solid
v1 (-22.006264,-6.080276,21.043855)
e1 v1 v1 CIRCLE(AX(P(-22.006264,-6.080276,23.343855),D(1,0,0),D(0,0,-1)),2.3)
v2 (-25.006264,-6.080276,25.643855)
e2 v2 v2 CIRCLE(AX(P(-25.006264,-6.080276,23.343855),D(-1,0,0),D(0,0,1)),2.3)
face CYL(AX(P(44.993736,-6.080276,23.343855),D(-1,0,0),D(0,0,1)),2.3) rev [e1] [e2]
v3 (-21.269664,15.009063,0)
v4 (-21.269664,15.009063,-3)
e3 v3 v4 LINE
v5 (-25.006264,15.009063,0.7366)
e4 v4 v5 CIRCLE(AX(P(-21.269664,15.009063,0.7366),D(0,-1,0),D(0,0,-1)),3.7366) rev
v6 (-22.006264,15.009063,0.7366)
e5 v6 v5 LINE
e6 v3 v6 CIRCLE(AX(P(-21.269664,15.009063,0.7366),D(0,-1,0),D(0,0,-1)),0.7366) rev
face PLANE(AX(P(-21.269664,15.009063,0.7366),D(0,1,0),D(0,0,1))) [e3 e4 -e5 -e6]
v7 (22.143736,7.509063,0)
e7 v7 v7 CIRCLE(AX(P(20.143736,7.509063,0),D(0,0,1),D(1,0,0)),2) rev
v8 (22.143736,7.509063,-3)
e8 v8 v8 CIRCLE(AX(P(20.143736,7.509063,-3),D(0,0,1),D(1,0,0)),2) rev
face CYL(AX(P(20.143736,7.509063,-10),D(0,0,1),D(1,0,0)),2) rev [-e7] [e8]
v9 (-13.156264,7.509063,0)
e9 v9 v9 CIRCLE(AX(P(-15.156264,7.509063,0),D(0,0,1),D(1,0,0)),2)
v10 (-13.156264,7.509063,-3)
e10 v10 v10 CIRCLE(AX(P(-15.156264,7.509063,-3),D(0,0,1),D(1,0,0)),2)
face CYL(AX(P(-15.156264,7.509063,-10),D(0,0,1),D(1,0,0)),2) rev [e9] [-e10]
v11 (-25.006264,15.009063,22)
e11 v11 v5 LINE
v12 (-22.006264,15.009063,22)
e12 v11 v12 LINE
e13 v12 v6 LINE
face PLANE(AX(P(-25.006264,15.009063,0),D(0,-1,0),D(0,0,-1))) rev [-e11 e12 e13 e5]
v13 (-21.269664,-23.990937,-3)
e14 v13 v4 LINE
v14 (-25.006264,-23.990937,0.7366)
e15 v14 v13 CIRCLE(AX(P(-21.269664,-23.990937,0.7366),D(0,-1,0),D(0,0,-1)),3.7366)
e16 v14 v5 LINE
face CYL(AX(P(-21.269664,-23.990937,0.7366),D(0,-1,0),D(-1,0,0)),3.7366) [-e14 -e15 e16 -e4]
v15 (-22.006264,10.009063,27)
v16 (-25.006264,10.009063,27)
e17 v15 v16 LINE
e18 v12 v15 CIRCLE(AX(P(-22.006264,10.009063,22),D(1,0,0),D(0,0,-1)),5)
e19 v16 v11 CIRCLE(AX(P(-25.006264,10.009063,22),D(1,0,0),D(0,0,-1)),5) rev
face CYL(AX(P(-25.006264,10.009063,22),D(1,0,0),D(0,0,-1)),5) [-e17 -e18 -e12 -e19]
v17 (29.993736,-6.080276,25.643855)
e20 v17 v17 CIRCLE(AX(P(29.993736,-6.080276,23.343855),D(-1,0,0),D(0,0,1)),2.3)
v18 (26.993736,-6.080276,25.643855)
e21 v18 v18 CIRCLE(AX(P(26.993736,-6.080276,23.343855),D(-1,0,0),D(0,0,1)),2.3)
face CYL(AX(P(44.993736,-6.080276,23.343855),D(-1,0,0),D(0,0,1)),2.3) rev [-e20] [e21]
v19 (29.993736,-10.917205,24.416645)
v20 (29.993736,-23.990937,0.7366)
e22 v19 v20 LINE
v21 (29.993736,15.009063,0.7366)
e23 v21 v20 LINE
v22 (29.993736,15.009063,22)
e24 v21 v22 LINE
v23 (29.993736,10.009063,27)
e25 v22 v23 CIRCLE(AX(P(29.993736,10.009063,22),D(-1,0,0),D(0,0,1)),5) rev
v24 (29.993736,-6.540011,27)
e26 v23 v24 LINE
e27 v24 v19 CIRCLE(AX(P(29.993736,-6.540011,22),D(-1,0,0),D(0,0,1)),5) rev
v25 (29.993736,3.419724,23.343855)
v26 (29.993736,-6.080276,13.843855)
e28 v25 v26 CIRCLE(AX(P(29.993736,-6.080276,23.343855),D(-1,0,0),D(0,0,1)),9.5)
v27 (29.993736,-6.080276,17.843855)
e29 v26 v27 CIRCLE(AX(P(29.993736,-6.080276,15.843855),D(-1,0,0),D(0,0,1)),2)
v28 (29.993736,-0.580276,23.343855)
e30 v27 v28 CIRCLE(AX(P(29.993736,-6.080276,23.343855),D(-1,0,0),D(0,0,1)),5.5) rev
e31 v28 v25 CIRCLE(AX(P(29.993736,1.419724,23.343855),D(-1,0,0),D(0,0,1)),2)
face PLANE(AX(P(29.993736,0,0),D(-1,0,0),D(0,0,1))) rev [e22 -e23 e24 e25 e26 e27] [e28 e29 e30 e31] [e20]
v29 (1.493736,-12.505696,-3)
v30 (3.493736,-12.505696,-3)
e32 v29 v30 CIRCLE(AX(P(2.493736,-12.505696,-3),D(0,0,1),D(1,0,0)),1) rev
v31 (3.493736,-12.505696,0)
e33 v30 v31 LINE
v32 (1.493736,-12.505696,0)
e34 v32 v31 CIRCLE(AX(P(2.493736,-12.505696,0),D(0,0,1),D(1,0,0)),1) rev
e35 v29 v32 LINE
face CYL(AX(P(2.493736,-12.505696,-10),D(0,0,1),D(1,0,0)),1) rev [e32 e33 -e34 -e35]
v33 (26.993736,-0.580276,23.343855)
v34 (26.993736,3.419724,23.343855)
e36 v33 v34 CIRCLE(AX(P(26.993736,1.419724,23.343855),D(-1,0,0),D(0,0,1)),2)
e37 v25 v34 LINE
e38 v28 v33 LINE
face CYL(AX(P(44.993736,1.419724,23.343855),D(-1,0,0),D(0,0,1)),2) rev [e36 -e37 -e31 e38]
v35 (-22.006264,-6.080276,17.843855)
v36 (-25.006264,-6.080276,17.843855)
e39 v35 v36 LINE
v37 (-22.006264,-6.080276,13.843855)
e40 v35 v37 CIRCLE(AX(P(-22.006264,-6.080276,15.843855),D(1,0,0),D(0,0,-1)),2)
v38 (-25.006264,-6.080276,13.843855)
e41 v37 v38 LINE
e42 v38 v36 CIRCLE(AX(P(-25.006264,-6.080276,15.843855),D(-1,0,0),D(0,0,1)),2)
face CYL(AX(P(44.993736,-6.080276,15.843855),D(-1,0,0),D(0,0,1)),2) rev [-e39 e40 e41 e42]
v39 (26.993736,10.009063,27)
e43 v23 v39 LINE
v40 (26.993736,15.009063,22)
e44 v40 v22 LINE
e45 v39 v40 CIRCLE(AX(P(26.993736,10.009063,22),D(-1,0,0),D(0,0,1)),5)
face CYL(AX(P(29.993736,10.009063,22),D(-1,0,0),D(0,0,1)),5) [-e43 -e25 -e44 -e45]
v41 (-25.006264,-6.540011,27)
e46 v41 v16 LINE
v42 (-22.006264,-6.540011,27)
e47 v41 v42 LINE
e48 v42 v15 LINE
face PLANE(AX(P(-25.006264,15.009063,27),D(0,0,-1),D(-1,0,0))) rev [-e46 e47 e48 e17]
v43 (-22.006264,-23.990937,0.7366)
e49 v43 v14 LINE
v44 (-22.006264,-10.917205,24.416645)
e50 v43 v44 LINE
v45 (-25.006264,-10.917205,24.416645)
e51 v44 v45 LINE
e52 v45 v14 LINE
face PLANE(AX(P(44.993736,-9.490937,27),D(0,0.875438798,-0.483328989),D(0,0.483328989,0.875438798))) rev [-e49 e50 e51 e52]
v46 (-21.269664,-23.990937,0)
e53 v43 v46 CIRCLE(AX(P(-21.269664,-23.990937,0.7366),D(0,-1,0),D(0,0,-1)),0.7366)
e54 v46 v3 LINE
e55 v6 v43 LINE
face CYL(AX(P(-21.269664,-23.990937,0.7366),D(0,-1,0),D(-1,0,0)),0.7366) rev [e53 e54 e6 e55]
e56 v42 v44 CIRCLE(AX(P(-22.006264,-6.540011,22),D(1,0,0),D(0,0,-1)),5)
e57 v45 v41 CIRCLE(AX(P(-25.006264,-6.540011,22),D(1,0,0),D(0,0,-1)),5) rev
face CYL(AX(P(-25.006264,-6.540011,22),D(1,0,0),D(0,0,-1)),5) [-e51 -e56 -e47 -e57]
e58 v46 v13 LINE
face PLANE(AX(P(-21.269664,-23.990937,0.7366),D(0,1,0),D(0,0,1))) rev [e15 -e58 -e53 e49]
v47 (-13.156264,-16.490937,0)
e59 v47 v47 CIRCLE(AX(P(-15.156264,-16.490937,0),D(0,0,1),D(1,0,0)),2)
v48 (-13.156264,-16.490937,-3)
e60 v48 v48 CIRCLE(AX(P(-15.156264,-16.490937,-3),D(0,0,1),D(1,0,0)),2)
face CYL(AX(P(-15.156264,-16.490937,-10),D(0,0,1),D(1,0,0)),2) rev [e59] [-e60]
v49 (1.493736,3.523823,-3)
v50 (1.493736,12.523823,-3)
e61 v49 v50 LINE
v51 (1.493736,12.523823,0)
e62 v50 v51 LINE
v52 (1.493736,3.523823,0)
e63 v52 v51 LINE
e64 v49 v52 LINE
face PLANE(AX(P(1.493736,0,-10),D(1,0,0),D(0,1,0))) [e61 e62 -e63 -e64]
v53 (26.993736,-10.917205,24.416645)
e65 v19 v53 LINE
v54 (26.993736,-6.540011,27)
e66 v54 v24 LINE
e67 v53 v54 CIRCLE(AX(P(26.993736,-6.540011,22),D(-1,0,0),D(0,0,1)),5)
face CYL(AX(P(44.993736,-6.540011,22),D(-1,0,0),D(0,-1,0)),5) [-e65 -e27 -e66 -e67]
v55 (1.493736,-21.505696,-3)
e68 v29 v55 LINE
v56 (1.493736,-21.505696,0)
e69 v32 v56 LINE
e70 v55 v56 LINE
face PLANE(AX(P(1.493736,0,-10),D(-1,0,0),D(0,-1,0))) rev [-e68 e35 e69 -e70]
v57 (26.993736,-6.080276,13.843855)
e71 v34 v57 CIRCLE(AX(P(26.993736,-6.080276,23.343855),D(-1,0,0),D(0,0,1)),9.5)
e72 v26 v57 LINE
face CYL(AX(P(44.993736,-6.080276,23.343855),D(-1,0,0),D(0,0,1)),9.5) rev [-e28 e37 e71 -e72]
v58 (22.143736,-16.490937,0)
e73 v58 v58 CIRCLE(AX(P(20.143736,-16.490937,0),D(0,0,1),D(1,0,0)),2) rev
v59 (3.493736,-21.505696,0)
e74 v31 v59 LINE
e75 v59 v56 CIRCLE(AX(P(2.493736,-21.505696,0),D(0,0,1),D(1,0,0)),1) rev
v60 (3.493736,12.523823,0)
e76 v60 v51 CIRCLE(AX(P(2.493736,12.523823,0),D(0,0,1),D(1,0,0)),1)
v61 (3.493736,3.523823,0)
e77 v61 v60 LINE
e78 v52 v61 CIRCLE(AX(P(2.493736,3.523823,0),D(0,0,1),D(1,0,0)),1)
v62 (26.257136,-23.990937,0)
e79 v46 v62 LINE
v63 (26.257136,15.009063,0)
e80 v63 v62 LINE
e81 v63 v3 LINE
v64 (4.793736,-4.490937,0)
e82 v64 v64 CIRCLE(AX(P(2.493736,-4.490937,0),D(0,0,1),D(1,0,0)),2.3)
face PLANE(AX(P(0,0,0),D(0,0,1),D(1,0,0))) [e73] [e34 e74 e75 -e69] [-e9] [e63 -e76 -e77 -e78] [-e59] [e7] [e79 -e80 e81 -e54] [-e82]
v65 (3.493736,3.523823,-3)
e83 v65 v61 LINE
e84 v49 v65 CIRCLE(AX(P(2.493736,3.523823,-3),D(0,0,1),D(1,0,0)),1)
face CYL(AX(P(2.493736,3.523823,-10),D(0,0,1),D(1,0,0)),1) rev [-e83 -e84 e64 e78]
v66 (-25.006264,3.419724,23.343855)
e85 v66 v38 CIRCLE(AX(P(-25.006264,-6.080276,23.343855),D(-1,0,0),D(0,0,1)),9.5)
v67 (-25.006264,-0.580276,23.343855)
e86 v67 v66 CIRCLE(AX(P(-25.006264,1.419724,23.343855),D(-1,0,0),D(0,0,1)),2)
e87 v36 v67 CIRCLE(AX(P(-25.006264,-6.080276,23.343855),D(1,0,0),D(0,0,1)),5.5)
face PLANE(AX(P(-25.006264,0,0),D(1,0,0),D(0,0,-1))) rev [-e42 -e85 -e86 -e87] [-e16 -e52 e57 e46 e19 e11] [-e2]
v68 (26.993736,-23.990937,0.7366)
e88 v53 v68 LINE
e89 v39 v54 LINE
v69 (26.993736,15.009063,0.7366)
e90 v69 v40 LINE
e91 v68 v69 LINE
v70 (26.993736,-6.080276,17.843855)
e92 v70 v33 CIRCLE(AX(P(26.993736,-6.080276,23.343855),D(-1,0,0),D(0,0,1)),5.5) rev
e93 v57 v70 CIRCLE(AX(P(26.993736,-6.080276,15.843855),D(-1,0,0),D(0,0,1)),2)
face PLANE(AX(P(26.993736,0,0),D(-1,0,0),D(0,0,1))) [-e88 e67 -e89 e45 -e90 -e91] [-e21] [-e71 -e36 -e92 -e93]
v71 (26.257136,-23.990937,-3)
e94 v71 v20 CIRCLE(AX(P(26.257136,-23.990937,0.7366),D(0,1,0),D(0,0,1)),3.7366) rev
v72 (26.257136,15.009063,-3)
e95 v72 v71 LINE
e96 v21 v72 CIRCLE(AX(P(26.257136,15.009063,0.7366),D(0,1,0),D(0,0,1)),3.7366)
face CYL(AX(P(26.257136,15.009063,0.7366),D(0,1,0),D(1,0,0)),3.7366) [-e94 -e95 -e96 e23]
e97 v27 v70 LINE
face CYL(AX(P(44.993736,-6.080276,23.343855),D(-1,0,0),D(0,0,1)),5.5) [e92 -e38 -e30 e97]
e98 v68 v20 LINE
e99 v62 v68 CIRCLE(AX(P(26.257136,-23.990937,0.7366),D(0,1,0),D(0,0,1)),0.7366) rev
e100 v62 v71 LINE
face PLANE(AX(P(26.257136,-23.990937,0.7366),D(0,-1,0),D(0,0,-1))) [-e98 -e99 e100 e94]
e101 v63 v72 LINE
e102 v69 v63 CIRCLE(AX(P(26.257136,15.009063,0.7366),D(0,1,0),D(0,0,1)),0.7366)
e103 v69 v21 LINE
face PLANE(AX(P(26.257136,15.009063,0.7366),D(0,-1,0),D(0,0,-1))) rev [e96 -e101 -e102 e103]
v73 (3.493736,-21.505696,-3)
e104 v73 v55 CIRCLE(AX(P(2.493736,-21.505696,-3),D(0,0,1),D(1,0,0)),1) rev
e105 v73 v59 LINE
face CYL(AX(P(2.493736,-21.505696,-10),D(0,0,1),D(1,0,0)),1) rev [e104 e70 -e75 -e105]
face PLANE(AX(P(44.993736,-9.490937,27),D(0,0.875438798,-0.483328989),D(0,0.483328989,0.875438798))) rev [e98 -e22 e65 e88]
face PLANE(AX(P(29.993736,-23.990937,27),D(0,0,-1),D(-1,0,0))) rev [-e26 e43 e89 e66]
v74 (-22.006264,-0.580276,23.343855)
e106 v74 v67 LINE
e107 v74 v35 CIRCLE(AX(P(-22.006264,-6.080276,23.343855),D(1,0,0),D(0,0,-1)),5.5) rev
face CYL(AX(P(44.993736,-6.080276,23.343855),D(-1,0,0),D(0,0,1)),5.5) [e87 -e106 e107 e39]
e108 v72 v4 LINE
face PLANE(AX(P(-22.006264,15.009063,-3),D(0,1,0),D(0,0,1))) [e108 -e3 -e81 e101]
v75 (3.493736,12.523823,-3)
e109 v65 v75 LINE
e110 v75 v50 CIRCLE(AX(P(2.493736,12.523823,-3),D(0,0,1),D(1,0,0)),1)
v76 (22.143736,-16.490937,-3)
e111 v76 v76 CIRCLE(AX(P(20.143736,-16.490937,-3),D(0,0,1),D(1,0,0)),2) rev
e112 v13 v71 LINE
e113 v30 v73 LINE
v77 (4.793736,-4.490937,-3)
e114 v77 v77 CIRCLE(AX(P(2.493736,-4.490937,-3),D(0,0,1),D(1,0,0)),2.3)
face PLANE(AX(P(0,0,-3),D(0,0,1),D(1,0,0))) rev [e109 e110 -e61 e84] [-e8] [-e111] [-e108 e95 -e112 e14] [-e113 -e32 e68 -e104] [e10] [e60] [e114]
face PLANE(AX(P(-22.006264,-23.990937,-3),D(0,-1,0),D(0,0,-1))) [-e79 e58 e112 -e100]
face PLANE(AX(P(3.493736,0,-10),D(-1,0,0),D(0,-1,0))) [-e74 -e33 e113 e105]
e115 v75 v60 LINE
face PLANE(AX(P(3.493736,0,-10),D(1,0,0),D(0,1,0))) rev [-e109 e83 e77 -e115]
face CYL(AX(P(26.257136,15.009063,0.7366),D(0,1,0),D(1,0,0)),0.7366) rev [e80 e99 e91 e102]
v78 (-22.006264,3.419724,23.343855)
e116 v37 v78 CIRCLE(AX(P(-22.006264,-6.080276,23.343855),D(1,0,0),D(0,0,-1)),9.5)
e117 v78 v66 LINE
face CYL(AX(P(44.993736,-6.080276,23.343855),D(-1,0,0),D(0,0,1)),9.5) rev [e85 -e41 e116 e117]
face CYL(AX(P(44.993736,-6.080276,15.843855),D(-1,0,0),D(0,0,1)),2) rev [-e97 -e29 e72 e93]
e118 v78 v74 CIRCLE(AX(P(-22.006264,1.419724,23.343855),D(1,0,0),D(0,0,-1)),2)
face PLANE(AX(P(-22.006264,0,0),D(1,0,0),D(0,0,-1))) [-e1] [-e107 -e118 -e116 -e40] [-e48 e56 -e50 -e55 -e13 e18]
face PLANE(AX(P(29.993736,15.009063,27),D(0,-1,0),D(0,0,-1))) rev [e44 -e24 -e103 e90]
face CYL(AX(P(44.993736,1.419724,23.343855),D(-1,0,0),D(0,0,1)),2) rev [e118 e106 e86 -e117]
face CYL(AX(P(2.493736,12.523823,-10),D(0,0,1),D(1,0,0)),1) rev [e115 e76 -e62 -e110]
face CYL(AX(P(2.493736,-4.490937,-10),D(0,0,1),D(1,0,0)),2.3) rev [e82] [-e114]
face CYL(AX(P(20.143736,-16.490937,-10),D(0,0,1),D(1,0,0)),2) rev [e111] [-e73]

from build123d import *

# Parameters (mm, degrees)
ESBO_O1_W                        = 49
ESBO_O1_H                        = 39
FLANGE_BASE1_DEPTH               = 3
ESBO_O6_R                        = 2.3
CORTE_EXTRUS_O1_DEPTH            = 10
ARESTA_FLANGE1_STRIP_W           = 13.4732
ARESTA_FLANGE1_STRIP_H           = 3
ARESTA_FLANGE1_STRIP_CUT_DEPTH   = 39
ARESTA_FLANGE1_STRIP_2_W         = 13.4732
ARESTA_FLANGE1_STRIP_2_H         = 3
ARESTA_FLANGE1_STRIP_CUT_2_DEPTH = 39
ARESTA_FLANGE1_DEPTH             = 39
ARESTA_FLANGE1_BEND_DEPTH        = 39
ESBO_O13_R                       = 2.3
CORTE_EXTRUS_O2_DEPTH            = 70
FILETE1_R                        = 5


# Sheet-metal steps are written as plain solids
with BuildPart() as part:
    # Esboço1 → Flange-base1 (new body)
    with BuildSketch(Plane.XY):
        with Locations((2.493735783, -4.490936556)):
            Rectangle(ESBO_O1_W, ESBO_O1_H)
    extrude(amount=-FLANGE_BASE1_DEPTH)

    # Esboço6 → Corte-extrusão1 (cut)
    with BuildSketch(Plane.XY):
        with BuildLine():
            Line((-15.156264217, 5.509063444), (-15.156264217, 7.509063444))
            Line((-15.156264217, 7.509063444), (-13.156264217, 7.509063444))
            ThreePointArc((-13.156264217, 7.509063444), (-16.570477779, 8.923277006), (-15.156264217, 5.509063444))
        make_face()
        with BuildLine():
            Line((-13.156264217, 7.509063444), (-15.156264217, 7.509063444))
            Line((-15.156264217, 7.509063444), (-15.156264217, 5.509063444))
            ThreePointArc((-15.156264217, 5.509063444), (-13.742050654, 6.094849882), (-13.156264217, 7.509063444))
        make_face()
        with BuildLine():
            ThreePointArc((-13.156264217, -16.490936556), (-13.742050654, -15.076722994), (-15.156264217, -14.490936556))
            Line((-15.156264217, -14.490936556), (-15.156264217, -16.490936556))
            Line((-15.156264217, -16.490936556), (-13.156264217, -16.490936556))
        make_face()
        with BuildLine():
            Line((-15.156264217, -16.490936556), (-15.156264217, -14.490936556))
            ThreePointArc((-15.156264217, -14.490936556), (-16.570477779, -17.905150118), (-13.156264217, -16.490936556))
            Line((-13.156264217, -16.490936556), (-15.156264217, -16.490936556))
        make_face()
        with Locations((2.493735783, -4.490936556)):
            Circle(ESBO_O6_R)
        with BuildLine():
            Line((3.493735783, 7.509063444), (1.493735783, 7.509063444))
            Line((1.493735783, 7.509063444), (1.493735783, 3.523823043))
            ThreePointArc((1.493735783, 3.523823043), (2.493735783, 2.523823043), (3.493735783, 3.523823043))
            Line((3.493735783, 3.523823043), (3.493735783, 7.509063444))
        make_face()
        with BuildLine():
            Line((1.493735783, 12.523823043), (1.493735783, 7.509063444))
            Line((1.493735783, 7.509063444), (3.493735783, 7.509063444))
            Line((3.493735783, 7.509063444), (3.493735783, 12.523823043))
            ThreePointArc((3.493735783, 12.523823043), (2.493735783, 13.523823043), (1.493735783, 12.523823043))
        make_face()
        with BuildLine():
            Line((1.493735783, -12.505696155), (1.493735783, -16.490936556))
            Line((1.493735783, -16.490936556), (3.493735783, -16.490936556))
            Line((3.493735783, -16.490936556), (3.493735783, -12.505696155))
            ThreePointArc((3.493735783, -12.505696155), (2.493735783, -11.505696155), (1.493735783, -12.505696155))
        make_face()
        with BuildLine():
            Line((3.493735783, -16.490936556), (1.493735783, -16.490936556))
            Line((1.493735783, -16.490936556), (1.493735783, -21.505696155))
            ThreePointArc((1.493735783, -21.505696155), (2.493735783, -22.505696155), (3.493735783, -21.505696155))
            Line((3.493735783, -21.505696155), (3.493735783, -16.490936556))
        make_face()
        with BuildLine():
            ThreePointArc((22.143735783, -16.490936556), (21.557949346, -15.076722994), (20.143735783, -14.490936556))
            Line((20.143735783, -14.490936556), (20.143735783, -16.490936556))
            Line((20.143735783, -16.490936556), (18.143735783, -16.490936556))
            ThreePointArc((18.143735783, -16.490936556), (20.143735783, -18.490936556), (22.143735783, -16.490936556))
        make_face()
        with BuildLine():
            Line((20.143735783, -16.490936556), (20.143735783, -14.490936556))
            ThreePointArc((20.143735783, -14.490936556), (18.729522221, -15.076722994), (18.143735783, -16.490936556))
            Line((18.143735783, -16.490936556), (20.143735783, -16.490936556))
        make_face()
        with BuildLine():
            ThreePointArc((22.143735783, 7.509063444), (20.143735783, 9.509063444), (18.143735783, 7.509063444))
            Line((18.143735783, 7.509063444), (20.143735783, 7.509063444))
            Line((20.143735783, 7.509063444), (20.143735783, 5.509063444))
            ThreePointArc((20.143735783, 5.509063444), (21.557949346, 6.094849882), (22.143735783, 7.509063444))
        make_face()
        with BuildLine():
            Line((20.143735783, 7.509063444), (18.143735783, 7.509063444))
            ThreePointArc((18.143735783, 7.509063444), (18.729522221, 6.094849882), (20.143735783, 5.509063444))
            Line((20.143735783, 5.509063444), (20.143735783, 7.509063444))
        make_face()
    extrude(amount=-CORTE_EXTRUS_O1_DEPTH, mode=Mode.SUBTRACT)

    # Aresta-Flange1 strip (across the edge) → Aresta-Flange1 strip cut (cut)
    with BuildSketch(Plane(origin=(26.993735783, -23.990936556, 0), x_dir=(-1, 0, 0), z_dir=(0, 1, 0))):
        with Locations((-6, -1.5)):
            Rectangle(ARESTA_FLANGE1_STRIP_W, ARESTA_FLANGE1_STRIP_H)
    extrude(amount=ARESTA_FLANGE1_STRIP_CUT_DEPTH, mode=Mode.SUBTRACT)

    # Aresta-Flange1 strip 2 (across the edge) → Aresta-Flange1 strip cut 2 (cut)
    with BuildSketch(Plane(origin=(-22.006264217, 15.009063444, 0), x_dir=(1, 0, 0), z_dir=(0, -1, 0))):
        with Locations((-6, -1.5)):
            Rectangle(ARESTA_FLANGE1_STRIP_2_W, ARESTA_FLANGE1_STRIP_2_H)
    extrude(amount=ARESTA_FLANGE1_STRIP_CUT_2_DEPTH, mode=Mode.SUBTRACT)

    # Aresta-Flange1 section (across the edge) → Aresta-Flange1 (add)
    with BuildSketch(Plane(origin=(26.993735783, -23.990936556, 0), x_dir=(-1, 0, 0), z_dir=(0, 1, 0))):
        with BuildLine():
            Line((-3, 0.7366), (-3, 27))
            Line((-3, 27), (0, 27))
            Line((0, 27), (0, 0.7366))
            ThreePointArc((0, 0.7366), (0.215745145, 0.215745145), (0.7366, 0))
            Line((0.7366, 0), (0.7366, -3))
            ThreePointArc((0.7366, -3), (-1.905575199, -1.905575199), (-3, 0.7366))
        make_face()
    extrude(amount=ARESTA_FLANGE1_DEPTH)

    # Aresta-Flange1 section 2 (across the edge) → Aresta-Flange1 bend (add)
    with BuildSketch(Plane(origin=(-22.006264217, 15.009063444, 0), x_dir=(1, 0, 0), z_dir=(0, -1, 0))):
        with BuildLine():
            Line((-3, 0.7366), (-3, 27))
            Line((-3, 27), (0, 27))
            Line((0, 27), (0, 0.7366))
            ThreePointArc((0, 0.7366), (0.215745145, 0.215745145), (0.7366, 0))
            Line((0.7366, 0), (0.7366, -3))
            ThreePointArc((0.7366, -3), (-1.905575199, -1.905575199), (-3, 0.7366))
        make_face()
    extrude(amount=ARESTA_FLANGE1_BEND_DEPTH)

    # Esboço13 → Corte-extrusão2 (cut)
    with BuildSketch(Plane.ZY.offset(25.006264217)):
        with Locations((23.343855314, -6.08027591)):
            Circle(ESBO_O13_R)
        Polygon((0.7366, -23.990936556), (27, -23.990936556), (27, -9.490936556), align=None)
        with BuildLine():
            ThreePointArc((23.343855314, 3.41972409), (16.626340893, 0.637238511), (13.843855314, -6.08027591))
            ThreePointArc((13.843855314, -6.08027591), (15.843855314, -8.08027591), (17.843855314, -6.08027591))
            ThreePointArc((17.843855314, -6.08027591), (19.454768018, -2.191188614), (23.343855314, -0.58027591))
            ThreePointArc((23.343855314, -0.58027591), (25.343855314, 1.41972409), (23.343855314, 3.41972409))
        make_face()
    extrude(amount=-CORTE_EXTRUS_O2_DEPTH, mode=Mode.SUBTRACT)

    # Filete1
    filete1_edges = [part.edges().sort_by_distance(p)[0] for p in [
        (28.493735783, 15.009063444, 27),
        (-23.506264217, 15.009063444, 27),
        (-23.506264217, -9.490936556, 27),
        (28.493735783, -9.490936556, 27),
    ]]
    fillet(filete1_edges, radius=FILETE1_R)


solid = part.part
